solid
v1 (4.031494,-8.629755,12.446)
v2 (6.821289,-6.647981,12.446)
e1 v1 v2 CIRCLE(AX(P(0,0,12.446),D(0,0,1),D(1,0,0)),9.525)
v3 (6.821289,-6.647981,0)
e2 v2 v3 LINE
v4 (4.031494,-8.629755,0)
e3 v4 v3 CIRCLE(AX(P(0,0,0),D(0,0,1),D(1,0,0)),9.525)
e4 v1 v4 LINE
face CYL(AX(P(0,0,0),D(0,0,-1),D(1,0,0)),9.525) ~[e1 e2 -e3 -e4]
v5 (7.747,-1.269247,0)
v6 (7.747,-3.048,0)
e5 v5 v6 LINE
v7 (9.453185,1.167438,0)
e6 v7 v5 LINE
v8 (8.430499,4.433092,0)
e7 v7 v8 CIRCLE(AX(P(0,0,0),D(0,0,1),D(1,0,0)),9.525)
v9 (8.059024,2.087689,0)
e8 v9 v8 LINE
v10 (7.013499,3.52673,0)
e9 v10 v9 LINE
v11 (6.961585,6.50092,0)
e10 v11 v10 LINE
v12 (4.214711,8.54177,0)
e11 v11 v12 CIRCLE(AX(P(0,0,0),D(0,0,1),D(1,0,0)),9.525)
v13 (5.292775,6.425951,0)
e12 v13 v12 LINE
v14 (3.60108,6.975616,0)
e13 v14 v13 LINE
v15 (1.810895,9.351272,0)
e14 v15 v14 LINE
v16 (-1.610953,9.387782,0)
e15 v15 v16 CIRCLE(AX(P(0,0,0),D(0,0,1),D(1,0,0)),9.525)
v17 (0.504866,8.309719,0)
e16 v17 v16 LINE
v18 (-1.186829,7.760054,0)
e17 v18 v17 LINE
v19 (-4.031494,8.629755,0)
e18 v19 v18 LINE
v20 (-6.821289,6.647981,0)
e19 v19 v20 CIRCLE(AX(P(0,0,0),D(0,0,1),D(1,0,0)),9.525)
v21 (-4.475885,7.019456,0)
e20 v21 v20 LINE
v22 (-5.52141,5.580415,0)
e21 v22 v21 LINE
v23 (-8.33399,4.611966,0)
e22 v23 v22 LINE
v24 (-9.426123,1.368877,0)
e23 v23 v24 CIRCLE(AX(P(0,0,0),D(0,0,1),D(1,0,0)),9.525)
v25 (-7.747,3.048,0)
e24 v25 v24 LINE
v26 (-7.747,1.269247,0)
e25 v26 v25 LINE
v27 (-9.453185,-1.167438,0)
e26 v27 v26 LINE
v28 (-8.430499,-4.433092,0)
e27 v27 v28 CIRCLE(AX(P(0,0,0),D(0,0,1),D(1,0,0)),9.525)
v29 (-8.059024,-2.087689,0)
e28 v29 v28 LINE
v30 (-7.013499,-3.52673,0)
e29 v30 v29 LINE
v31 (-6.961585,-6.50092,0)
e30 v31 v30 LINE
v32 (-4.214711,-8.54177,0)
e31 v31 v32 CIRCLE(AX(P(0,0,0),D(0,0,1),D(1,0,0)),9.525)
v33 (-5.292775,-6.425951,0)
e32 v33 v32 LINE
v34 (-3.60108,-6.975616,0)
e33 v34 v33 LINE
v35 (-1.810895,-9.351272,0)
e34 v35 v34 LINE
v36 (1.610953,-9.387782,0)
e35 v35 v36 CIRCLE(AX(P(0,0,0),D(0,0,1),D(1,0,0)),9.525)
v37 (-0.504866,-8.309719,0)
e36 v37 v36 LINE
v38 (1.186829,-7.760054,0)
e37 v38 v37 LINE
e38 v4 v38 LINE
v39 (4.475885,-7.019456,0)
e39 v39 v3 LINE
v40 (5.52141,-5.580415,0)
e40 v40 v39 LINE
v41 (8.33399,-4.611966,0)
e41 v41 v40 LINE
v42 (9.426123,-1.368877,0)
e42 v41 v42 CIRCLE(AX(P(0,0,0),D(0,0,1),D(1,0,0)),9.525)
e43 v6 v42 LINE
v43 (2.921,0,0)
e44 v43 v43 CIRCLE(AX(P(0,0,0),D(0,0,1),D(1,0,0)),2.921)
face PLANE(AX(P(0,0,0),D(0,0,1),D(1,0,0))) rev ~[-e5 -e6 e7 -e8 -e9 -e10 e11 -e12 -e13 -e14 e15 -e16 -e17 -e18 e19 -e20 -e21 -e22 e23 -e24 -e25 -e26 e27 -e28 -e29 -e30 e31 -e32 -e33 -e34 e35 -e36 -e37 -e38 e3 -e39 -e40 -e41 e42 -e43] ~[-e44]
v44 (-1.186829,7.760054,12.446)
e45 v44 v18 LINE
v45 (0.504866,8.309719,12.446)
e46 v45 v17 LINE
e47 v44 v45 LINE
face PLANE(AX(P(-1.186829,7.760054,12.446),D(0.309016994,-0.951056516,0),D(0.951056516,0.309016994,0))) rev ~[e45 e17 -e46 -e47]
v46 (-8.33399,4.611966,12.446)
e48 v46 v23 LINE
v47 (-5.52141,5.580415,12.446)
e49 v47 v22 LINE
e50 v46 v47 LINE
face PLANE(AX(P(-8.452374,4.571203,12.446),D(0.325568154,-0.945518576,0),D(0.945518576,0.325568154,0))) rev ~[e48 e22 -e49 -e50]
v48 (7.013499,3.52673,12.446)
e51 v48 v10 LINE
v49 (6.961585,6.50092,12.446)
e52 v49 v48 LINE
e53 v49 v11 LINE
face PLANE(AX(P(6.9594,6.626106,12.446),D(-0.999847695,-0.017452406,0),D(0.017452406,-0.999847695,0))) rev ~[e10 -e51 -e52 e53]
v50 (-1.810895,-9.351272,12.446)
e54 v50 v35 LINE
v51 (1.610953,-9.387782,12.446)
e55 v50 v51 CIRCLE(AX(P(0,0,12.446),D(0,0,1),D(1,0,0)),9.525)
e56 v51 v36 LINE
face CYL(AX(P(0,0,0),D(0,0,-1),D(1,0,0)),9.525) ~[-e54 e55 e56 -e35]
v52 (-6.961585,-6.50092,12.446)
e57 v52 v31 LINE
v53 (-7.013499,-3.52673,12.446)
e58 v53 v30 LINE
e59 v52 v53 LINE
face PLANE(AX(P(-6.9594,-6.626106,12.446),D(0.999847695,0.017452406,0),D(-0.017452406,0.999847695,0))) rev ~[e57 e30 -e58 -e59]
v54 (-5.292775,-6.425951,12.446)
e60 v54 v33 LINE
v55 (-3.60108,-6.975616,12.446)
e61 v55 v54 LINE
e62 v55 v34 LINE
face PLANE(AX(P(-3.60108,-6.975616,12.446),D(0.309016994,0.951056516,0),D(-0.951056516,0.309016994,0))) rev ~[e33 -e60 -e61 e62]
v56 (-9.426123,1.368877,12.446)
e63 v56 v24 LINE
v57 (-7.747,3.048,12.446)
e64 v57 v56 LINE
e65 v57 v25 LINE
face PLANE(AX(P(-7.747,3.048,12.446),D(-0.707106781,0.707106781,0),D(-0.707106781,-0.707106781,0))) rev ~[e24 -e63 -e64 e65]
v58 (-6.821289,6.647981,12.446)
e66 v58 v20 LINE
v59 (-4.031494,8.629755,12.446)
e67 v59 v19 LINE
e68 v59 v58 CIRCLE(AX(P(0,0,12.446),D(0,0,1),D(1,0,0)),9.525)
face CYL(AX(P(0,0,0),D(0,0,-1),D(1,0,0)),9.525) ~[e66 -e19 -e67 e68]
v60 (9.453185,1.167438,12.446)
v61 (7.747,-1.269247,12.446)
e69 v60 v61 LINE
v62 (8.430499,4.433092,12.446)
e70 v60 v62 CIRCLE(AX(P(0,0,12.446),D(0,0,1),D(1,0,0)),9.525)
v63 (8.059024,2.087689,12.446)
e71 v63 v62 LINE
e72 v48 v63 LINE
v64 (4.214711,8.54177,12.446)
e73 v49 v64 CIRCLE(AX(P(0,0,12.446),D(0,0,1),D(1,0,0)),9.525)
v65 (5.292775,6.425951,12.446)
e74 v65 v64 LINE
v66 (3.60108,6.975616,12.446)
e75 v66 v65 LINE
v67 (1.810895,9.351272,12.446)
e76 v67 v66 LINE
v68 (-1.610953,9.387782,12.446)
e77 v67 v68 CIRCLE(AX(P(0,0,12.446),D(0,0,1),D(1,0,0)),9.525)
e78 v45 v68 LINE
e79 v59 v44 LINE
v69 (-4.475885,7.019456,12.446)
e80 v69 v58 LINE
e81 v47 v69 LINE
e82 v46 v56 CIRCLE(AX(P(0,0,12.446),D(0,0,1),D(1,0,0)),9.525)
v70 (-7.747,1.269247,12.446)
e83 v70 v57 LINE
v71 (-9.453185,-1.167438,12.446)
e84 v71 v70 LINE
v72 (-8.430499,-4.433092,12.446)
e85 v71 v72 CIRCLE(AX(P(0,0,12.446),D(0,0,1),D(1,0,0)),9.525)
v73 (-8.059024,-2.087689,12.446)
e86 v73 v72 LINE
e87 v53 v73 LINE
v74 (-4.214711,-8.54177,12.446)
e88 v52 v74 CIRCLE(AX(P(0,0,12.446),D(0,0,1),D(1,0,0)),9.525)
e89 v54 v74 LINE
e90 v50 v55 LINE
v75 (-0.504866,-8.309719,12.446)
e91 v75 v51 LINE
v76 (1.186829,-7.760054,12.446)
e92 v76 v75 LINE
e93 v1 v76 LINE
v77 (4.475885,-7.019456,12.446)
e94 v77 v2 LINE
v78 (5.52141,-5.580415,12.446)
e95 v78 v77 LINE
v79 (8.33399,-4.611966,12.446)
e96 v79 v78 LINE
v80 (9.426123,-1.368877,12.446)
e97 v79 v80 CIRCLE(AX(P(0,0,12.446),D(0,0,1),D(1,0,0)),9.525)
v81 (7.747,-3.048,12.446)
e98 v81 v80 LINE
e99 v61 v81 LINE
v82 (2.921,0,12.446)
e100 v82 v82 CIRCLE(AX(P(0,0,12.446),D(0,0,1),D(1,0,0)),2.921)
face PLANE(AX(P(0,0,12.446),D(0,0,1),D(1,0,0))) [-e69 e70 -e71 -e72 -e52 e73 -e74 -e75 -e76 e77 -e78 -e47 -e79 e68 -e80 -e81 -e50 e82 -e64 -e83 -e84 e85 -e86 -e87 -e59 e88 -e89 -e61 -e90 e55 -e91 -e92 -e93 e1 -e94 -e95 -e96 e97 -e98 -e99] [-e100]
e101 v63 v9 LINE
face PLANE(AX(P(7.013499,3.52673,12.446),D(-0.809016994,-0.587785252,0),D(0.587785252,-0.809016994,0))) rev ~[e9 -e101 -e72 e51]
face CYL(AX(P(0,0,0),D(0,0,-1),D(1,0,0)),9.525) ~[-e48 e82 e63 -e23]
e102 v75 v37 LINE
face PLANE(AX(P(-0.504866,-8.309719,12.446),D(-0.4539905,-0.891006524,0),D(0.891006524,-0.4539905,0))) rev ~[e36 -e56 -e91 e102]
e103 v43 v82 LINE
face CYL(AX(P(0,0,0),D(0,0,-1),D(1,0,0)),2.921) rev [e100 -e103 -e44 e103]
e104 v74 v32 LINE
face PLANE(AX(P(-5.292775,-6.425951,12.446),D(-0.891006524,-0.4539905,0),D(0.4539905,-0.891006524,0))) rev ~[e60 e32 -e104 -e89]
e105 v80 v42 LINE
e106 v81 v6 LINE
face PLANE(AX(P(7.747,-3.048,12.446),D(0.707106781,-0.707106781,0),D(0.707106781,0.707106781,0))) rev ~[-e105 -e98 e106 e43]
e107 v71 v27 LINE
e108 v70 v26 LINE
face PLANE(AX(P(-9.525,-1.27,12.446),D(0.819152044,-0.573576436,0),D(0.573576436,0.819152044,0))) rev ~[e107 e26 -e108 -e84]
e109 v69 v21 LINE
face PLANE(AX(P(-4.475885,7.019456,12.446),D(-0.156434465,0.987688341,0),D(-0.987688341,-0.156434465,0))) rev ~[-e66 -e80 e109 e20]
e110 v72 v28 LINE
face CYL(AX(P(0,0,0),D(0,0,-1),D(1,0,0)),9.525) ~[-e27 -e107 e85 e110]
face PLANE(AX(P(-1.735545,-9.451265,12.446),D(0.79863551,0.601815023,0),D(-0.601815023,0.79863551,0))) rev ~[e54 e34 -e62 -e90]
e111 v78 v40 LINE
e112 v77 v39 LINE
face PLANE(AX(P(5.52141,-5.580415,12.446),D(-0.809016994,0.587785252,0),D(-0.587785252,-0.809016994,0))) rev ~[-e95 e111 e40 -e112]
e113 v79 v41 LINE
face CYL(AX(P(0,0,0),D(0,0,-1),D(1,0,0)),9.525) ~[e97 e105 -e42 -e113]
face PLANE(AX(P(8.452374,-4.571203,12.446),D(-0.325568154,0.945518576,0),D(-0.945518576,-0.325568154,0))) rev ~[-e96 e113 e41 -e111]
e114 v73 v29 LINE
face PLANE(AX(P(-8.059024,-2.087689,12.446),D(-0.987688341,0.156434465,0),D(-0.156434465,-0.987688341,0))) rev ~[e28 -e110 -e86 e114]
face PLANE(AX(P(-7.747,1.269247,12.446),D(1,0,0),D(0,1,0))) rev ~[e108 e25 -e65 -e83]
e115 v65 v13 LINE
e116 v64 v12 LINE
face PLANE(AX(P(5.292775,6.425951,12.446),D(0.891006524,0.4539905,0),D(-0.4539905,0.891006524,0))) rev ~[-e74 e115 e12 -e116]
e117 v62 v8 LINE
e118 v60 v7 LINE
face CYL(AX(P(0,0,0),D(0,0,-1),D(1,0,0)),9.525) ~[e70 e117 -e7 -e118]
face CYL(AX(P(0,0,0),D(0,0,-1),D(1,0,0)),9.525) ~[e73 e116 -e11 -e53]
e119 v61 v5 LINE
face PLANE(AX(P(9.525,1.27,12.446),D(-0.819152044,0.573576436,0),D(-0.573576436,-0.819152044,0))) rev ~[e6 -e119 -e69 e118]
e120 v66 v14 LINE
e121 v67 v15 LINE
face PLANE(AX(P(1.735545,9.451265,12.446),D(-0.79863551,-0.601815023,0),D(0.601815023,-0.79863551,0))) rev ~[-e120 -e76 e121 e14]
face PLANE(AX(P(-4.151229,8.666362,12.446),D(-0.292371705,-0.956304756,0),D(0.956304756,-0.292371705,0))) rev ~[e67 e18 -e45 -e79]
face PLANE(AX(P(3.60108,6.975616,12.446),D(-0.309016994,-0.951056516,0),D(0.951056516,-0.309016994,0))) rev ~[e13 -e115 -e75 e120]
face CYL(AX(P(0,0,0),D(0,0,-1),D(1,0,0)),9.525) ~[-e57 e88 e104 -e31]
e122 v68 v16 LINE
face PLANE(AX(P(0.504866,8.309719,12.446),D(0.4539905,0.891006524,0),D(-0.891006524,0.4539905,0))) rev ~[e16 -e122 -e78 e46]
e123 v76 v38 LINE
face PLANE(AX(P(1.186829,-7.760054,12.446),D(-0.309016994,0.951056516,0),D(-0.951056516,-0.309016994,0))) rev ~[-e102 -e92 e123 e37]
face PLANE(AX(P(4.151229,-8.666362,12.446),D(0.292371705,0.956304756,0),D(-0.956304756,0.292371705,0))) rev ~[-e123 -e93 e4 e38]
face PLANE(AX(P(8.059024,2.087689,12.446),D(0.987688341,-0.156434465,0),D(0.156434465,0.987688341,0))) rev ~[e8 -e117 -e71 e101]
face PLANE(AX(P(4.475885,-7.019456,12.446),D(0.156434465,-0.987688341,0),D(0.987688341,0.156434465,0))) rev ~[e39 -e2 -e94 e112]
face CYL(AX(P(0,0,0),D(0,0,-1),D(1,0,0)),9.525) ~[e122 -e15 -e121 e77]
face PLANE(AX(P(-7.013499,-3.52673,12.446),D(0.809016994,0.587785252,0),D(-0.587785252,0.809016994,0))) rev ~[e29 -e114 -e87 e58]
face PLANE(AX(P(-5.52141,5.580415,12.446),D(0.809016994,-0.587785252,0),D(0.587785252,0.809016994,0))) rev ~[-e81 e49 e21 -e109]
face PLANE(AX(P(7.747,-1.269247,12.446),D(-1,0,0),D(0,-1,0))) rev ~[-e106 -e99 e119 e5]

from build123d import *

# Parameters (mm, degrees)
F2_R            = 9.525
F2_R_2          = 2.921
F3_DEPTH        = 12.446
F5_DEPTH        = 12.446
F5_COPIES_COUNT = 10


# Not quite as in the source:
# - a pattern or mirror of a feature is missing from the dataset's text; its kind, count and spacing are read off the source's solid


with BuildPart() as f3:
    # F2 (on Top) → F3 (new body)
    with BuildSketch(Plane.XY):
        Circle(F2_R)
        Circle(F2_R_2, mode=Mode.SUBTRACT)
    extrude(amount=F3_DEPTH)

    # F4 (on face) → F5 (cut, through all)
    with BuildSketch(Plane.XY.offset(12.446)):
        Polygon((9.525, -1.27), (9.525, 1.27), (7.747, -1.269247156), (7.747, -3.048), align=None)
    f5 = extrude(amount=-F5_DEPTH, mode=Mode.SUBTRACT)

    # F5_copies: F5 ×10 about axis
    f5_copies_axis = Axis((0, 0, 0), (0, 0, 1))
    for i in range(1, F5_COPIES_COUNT):
        add(f5.rotate(f5_copies_axis, i * 360 / F5_COPIES_COUNT), mode=Mode.SUBTRACT)


solid = f3.part
